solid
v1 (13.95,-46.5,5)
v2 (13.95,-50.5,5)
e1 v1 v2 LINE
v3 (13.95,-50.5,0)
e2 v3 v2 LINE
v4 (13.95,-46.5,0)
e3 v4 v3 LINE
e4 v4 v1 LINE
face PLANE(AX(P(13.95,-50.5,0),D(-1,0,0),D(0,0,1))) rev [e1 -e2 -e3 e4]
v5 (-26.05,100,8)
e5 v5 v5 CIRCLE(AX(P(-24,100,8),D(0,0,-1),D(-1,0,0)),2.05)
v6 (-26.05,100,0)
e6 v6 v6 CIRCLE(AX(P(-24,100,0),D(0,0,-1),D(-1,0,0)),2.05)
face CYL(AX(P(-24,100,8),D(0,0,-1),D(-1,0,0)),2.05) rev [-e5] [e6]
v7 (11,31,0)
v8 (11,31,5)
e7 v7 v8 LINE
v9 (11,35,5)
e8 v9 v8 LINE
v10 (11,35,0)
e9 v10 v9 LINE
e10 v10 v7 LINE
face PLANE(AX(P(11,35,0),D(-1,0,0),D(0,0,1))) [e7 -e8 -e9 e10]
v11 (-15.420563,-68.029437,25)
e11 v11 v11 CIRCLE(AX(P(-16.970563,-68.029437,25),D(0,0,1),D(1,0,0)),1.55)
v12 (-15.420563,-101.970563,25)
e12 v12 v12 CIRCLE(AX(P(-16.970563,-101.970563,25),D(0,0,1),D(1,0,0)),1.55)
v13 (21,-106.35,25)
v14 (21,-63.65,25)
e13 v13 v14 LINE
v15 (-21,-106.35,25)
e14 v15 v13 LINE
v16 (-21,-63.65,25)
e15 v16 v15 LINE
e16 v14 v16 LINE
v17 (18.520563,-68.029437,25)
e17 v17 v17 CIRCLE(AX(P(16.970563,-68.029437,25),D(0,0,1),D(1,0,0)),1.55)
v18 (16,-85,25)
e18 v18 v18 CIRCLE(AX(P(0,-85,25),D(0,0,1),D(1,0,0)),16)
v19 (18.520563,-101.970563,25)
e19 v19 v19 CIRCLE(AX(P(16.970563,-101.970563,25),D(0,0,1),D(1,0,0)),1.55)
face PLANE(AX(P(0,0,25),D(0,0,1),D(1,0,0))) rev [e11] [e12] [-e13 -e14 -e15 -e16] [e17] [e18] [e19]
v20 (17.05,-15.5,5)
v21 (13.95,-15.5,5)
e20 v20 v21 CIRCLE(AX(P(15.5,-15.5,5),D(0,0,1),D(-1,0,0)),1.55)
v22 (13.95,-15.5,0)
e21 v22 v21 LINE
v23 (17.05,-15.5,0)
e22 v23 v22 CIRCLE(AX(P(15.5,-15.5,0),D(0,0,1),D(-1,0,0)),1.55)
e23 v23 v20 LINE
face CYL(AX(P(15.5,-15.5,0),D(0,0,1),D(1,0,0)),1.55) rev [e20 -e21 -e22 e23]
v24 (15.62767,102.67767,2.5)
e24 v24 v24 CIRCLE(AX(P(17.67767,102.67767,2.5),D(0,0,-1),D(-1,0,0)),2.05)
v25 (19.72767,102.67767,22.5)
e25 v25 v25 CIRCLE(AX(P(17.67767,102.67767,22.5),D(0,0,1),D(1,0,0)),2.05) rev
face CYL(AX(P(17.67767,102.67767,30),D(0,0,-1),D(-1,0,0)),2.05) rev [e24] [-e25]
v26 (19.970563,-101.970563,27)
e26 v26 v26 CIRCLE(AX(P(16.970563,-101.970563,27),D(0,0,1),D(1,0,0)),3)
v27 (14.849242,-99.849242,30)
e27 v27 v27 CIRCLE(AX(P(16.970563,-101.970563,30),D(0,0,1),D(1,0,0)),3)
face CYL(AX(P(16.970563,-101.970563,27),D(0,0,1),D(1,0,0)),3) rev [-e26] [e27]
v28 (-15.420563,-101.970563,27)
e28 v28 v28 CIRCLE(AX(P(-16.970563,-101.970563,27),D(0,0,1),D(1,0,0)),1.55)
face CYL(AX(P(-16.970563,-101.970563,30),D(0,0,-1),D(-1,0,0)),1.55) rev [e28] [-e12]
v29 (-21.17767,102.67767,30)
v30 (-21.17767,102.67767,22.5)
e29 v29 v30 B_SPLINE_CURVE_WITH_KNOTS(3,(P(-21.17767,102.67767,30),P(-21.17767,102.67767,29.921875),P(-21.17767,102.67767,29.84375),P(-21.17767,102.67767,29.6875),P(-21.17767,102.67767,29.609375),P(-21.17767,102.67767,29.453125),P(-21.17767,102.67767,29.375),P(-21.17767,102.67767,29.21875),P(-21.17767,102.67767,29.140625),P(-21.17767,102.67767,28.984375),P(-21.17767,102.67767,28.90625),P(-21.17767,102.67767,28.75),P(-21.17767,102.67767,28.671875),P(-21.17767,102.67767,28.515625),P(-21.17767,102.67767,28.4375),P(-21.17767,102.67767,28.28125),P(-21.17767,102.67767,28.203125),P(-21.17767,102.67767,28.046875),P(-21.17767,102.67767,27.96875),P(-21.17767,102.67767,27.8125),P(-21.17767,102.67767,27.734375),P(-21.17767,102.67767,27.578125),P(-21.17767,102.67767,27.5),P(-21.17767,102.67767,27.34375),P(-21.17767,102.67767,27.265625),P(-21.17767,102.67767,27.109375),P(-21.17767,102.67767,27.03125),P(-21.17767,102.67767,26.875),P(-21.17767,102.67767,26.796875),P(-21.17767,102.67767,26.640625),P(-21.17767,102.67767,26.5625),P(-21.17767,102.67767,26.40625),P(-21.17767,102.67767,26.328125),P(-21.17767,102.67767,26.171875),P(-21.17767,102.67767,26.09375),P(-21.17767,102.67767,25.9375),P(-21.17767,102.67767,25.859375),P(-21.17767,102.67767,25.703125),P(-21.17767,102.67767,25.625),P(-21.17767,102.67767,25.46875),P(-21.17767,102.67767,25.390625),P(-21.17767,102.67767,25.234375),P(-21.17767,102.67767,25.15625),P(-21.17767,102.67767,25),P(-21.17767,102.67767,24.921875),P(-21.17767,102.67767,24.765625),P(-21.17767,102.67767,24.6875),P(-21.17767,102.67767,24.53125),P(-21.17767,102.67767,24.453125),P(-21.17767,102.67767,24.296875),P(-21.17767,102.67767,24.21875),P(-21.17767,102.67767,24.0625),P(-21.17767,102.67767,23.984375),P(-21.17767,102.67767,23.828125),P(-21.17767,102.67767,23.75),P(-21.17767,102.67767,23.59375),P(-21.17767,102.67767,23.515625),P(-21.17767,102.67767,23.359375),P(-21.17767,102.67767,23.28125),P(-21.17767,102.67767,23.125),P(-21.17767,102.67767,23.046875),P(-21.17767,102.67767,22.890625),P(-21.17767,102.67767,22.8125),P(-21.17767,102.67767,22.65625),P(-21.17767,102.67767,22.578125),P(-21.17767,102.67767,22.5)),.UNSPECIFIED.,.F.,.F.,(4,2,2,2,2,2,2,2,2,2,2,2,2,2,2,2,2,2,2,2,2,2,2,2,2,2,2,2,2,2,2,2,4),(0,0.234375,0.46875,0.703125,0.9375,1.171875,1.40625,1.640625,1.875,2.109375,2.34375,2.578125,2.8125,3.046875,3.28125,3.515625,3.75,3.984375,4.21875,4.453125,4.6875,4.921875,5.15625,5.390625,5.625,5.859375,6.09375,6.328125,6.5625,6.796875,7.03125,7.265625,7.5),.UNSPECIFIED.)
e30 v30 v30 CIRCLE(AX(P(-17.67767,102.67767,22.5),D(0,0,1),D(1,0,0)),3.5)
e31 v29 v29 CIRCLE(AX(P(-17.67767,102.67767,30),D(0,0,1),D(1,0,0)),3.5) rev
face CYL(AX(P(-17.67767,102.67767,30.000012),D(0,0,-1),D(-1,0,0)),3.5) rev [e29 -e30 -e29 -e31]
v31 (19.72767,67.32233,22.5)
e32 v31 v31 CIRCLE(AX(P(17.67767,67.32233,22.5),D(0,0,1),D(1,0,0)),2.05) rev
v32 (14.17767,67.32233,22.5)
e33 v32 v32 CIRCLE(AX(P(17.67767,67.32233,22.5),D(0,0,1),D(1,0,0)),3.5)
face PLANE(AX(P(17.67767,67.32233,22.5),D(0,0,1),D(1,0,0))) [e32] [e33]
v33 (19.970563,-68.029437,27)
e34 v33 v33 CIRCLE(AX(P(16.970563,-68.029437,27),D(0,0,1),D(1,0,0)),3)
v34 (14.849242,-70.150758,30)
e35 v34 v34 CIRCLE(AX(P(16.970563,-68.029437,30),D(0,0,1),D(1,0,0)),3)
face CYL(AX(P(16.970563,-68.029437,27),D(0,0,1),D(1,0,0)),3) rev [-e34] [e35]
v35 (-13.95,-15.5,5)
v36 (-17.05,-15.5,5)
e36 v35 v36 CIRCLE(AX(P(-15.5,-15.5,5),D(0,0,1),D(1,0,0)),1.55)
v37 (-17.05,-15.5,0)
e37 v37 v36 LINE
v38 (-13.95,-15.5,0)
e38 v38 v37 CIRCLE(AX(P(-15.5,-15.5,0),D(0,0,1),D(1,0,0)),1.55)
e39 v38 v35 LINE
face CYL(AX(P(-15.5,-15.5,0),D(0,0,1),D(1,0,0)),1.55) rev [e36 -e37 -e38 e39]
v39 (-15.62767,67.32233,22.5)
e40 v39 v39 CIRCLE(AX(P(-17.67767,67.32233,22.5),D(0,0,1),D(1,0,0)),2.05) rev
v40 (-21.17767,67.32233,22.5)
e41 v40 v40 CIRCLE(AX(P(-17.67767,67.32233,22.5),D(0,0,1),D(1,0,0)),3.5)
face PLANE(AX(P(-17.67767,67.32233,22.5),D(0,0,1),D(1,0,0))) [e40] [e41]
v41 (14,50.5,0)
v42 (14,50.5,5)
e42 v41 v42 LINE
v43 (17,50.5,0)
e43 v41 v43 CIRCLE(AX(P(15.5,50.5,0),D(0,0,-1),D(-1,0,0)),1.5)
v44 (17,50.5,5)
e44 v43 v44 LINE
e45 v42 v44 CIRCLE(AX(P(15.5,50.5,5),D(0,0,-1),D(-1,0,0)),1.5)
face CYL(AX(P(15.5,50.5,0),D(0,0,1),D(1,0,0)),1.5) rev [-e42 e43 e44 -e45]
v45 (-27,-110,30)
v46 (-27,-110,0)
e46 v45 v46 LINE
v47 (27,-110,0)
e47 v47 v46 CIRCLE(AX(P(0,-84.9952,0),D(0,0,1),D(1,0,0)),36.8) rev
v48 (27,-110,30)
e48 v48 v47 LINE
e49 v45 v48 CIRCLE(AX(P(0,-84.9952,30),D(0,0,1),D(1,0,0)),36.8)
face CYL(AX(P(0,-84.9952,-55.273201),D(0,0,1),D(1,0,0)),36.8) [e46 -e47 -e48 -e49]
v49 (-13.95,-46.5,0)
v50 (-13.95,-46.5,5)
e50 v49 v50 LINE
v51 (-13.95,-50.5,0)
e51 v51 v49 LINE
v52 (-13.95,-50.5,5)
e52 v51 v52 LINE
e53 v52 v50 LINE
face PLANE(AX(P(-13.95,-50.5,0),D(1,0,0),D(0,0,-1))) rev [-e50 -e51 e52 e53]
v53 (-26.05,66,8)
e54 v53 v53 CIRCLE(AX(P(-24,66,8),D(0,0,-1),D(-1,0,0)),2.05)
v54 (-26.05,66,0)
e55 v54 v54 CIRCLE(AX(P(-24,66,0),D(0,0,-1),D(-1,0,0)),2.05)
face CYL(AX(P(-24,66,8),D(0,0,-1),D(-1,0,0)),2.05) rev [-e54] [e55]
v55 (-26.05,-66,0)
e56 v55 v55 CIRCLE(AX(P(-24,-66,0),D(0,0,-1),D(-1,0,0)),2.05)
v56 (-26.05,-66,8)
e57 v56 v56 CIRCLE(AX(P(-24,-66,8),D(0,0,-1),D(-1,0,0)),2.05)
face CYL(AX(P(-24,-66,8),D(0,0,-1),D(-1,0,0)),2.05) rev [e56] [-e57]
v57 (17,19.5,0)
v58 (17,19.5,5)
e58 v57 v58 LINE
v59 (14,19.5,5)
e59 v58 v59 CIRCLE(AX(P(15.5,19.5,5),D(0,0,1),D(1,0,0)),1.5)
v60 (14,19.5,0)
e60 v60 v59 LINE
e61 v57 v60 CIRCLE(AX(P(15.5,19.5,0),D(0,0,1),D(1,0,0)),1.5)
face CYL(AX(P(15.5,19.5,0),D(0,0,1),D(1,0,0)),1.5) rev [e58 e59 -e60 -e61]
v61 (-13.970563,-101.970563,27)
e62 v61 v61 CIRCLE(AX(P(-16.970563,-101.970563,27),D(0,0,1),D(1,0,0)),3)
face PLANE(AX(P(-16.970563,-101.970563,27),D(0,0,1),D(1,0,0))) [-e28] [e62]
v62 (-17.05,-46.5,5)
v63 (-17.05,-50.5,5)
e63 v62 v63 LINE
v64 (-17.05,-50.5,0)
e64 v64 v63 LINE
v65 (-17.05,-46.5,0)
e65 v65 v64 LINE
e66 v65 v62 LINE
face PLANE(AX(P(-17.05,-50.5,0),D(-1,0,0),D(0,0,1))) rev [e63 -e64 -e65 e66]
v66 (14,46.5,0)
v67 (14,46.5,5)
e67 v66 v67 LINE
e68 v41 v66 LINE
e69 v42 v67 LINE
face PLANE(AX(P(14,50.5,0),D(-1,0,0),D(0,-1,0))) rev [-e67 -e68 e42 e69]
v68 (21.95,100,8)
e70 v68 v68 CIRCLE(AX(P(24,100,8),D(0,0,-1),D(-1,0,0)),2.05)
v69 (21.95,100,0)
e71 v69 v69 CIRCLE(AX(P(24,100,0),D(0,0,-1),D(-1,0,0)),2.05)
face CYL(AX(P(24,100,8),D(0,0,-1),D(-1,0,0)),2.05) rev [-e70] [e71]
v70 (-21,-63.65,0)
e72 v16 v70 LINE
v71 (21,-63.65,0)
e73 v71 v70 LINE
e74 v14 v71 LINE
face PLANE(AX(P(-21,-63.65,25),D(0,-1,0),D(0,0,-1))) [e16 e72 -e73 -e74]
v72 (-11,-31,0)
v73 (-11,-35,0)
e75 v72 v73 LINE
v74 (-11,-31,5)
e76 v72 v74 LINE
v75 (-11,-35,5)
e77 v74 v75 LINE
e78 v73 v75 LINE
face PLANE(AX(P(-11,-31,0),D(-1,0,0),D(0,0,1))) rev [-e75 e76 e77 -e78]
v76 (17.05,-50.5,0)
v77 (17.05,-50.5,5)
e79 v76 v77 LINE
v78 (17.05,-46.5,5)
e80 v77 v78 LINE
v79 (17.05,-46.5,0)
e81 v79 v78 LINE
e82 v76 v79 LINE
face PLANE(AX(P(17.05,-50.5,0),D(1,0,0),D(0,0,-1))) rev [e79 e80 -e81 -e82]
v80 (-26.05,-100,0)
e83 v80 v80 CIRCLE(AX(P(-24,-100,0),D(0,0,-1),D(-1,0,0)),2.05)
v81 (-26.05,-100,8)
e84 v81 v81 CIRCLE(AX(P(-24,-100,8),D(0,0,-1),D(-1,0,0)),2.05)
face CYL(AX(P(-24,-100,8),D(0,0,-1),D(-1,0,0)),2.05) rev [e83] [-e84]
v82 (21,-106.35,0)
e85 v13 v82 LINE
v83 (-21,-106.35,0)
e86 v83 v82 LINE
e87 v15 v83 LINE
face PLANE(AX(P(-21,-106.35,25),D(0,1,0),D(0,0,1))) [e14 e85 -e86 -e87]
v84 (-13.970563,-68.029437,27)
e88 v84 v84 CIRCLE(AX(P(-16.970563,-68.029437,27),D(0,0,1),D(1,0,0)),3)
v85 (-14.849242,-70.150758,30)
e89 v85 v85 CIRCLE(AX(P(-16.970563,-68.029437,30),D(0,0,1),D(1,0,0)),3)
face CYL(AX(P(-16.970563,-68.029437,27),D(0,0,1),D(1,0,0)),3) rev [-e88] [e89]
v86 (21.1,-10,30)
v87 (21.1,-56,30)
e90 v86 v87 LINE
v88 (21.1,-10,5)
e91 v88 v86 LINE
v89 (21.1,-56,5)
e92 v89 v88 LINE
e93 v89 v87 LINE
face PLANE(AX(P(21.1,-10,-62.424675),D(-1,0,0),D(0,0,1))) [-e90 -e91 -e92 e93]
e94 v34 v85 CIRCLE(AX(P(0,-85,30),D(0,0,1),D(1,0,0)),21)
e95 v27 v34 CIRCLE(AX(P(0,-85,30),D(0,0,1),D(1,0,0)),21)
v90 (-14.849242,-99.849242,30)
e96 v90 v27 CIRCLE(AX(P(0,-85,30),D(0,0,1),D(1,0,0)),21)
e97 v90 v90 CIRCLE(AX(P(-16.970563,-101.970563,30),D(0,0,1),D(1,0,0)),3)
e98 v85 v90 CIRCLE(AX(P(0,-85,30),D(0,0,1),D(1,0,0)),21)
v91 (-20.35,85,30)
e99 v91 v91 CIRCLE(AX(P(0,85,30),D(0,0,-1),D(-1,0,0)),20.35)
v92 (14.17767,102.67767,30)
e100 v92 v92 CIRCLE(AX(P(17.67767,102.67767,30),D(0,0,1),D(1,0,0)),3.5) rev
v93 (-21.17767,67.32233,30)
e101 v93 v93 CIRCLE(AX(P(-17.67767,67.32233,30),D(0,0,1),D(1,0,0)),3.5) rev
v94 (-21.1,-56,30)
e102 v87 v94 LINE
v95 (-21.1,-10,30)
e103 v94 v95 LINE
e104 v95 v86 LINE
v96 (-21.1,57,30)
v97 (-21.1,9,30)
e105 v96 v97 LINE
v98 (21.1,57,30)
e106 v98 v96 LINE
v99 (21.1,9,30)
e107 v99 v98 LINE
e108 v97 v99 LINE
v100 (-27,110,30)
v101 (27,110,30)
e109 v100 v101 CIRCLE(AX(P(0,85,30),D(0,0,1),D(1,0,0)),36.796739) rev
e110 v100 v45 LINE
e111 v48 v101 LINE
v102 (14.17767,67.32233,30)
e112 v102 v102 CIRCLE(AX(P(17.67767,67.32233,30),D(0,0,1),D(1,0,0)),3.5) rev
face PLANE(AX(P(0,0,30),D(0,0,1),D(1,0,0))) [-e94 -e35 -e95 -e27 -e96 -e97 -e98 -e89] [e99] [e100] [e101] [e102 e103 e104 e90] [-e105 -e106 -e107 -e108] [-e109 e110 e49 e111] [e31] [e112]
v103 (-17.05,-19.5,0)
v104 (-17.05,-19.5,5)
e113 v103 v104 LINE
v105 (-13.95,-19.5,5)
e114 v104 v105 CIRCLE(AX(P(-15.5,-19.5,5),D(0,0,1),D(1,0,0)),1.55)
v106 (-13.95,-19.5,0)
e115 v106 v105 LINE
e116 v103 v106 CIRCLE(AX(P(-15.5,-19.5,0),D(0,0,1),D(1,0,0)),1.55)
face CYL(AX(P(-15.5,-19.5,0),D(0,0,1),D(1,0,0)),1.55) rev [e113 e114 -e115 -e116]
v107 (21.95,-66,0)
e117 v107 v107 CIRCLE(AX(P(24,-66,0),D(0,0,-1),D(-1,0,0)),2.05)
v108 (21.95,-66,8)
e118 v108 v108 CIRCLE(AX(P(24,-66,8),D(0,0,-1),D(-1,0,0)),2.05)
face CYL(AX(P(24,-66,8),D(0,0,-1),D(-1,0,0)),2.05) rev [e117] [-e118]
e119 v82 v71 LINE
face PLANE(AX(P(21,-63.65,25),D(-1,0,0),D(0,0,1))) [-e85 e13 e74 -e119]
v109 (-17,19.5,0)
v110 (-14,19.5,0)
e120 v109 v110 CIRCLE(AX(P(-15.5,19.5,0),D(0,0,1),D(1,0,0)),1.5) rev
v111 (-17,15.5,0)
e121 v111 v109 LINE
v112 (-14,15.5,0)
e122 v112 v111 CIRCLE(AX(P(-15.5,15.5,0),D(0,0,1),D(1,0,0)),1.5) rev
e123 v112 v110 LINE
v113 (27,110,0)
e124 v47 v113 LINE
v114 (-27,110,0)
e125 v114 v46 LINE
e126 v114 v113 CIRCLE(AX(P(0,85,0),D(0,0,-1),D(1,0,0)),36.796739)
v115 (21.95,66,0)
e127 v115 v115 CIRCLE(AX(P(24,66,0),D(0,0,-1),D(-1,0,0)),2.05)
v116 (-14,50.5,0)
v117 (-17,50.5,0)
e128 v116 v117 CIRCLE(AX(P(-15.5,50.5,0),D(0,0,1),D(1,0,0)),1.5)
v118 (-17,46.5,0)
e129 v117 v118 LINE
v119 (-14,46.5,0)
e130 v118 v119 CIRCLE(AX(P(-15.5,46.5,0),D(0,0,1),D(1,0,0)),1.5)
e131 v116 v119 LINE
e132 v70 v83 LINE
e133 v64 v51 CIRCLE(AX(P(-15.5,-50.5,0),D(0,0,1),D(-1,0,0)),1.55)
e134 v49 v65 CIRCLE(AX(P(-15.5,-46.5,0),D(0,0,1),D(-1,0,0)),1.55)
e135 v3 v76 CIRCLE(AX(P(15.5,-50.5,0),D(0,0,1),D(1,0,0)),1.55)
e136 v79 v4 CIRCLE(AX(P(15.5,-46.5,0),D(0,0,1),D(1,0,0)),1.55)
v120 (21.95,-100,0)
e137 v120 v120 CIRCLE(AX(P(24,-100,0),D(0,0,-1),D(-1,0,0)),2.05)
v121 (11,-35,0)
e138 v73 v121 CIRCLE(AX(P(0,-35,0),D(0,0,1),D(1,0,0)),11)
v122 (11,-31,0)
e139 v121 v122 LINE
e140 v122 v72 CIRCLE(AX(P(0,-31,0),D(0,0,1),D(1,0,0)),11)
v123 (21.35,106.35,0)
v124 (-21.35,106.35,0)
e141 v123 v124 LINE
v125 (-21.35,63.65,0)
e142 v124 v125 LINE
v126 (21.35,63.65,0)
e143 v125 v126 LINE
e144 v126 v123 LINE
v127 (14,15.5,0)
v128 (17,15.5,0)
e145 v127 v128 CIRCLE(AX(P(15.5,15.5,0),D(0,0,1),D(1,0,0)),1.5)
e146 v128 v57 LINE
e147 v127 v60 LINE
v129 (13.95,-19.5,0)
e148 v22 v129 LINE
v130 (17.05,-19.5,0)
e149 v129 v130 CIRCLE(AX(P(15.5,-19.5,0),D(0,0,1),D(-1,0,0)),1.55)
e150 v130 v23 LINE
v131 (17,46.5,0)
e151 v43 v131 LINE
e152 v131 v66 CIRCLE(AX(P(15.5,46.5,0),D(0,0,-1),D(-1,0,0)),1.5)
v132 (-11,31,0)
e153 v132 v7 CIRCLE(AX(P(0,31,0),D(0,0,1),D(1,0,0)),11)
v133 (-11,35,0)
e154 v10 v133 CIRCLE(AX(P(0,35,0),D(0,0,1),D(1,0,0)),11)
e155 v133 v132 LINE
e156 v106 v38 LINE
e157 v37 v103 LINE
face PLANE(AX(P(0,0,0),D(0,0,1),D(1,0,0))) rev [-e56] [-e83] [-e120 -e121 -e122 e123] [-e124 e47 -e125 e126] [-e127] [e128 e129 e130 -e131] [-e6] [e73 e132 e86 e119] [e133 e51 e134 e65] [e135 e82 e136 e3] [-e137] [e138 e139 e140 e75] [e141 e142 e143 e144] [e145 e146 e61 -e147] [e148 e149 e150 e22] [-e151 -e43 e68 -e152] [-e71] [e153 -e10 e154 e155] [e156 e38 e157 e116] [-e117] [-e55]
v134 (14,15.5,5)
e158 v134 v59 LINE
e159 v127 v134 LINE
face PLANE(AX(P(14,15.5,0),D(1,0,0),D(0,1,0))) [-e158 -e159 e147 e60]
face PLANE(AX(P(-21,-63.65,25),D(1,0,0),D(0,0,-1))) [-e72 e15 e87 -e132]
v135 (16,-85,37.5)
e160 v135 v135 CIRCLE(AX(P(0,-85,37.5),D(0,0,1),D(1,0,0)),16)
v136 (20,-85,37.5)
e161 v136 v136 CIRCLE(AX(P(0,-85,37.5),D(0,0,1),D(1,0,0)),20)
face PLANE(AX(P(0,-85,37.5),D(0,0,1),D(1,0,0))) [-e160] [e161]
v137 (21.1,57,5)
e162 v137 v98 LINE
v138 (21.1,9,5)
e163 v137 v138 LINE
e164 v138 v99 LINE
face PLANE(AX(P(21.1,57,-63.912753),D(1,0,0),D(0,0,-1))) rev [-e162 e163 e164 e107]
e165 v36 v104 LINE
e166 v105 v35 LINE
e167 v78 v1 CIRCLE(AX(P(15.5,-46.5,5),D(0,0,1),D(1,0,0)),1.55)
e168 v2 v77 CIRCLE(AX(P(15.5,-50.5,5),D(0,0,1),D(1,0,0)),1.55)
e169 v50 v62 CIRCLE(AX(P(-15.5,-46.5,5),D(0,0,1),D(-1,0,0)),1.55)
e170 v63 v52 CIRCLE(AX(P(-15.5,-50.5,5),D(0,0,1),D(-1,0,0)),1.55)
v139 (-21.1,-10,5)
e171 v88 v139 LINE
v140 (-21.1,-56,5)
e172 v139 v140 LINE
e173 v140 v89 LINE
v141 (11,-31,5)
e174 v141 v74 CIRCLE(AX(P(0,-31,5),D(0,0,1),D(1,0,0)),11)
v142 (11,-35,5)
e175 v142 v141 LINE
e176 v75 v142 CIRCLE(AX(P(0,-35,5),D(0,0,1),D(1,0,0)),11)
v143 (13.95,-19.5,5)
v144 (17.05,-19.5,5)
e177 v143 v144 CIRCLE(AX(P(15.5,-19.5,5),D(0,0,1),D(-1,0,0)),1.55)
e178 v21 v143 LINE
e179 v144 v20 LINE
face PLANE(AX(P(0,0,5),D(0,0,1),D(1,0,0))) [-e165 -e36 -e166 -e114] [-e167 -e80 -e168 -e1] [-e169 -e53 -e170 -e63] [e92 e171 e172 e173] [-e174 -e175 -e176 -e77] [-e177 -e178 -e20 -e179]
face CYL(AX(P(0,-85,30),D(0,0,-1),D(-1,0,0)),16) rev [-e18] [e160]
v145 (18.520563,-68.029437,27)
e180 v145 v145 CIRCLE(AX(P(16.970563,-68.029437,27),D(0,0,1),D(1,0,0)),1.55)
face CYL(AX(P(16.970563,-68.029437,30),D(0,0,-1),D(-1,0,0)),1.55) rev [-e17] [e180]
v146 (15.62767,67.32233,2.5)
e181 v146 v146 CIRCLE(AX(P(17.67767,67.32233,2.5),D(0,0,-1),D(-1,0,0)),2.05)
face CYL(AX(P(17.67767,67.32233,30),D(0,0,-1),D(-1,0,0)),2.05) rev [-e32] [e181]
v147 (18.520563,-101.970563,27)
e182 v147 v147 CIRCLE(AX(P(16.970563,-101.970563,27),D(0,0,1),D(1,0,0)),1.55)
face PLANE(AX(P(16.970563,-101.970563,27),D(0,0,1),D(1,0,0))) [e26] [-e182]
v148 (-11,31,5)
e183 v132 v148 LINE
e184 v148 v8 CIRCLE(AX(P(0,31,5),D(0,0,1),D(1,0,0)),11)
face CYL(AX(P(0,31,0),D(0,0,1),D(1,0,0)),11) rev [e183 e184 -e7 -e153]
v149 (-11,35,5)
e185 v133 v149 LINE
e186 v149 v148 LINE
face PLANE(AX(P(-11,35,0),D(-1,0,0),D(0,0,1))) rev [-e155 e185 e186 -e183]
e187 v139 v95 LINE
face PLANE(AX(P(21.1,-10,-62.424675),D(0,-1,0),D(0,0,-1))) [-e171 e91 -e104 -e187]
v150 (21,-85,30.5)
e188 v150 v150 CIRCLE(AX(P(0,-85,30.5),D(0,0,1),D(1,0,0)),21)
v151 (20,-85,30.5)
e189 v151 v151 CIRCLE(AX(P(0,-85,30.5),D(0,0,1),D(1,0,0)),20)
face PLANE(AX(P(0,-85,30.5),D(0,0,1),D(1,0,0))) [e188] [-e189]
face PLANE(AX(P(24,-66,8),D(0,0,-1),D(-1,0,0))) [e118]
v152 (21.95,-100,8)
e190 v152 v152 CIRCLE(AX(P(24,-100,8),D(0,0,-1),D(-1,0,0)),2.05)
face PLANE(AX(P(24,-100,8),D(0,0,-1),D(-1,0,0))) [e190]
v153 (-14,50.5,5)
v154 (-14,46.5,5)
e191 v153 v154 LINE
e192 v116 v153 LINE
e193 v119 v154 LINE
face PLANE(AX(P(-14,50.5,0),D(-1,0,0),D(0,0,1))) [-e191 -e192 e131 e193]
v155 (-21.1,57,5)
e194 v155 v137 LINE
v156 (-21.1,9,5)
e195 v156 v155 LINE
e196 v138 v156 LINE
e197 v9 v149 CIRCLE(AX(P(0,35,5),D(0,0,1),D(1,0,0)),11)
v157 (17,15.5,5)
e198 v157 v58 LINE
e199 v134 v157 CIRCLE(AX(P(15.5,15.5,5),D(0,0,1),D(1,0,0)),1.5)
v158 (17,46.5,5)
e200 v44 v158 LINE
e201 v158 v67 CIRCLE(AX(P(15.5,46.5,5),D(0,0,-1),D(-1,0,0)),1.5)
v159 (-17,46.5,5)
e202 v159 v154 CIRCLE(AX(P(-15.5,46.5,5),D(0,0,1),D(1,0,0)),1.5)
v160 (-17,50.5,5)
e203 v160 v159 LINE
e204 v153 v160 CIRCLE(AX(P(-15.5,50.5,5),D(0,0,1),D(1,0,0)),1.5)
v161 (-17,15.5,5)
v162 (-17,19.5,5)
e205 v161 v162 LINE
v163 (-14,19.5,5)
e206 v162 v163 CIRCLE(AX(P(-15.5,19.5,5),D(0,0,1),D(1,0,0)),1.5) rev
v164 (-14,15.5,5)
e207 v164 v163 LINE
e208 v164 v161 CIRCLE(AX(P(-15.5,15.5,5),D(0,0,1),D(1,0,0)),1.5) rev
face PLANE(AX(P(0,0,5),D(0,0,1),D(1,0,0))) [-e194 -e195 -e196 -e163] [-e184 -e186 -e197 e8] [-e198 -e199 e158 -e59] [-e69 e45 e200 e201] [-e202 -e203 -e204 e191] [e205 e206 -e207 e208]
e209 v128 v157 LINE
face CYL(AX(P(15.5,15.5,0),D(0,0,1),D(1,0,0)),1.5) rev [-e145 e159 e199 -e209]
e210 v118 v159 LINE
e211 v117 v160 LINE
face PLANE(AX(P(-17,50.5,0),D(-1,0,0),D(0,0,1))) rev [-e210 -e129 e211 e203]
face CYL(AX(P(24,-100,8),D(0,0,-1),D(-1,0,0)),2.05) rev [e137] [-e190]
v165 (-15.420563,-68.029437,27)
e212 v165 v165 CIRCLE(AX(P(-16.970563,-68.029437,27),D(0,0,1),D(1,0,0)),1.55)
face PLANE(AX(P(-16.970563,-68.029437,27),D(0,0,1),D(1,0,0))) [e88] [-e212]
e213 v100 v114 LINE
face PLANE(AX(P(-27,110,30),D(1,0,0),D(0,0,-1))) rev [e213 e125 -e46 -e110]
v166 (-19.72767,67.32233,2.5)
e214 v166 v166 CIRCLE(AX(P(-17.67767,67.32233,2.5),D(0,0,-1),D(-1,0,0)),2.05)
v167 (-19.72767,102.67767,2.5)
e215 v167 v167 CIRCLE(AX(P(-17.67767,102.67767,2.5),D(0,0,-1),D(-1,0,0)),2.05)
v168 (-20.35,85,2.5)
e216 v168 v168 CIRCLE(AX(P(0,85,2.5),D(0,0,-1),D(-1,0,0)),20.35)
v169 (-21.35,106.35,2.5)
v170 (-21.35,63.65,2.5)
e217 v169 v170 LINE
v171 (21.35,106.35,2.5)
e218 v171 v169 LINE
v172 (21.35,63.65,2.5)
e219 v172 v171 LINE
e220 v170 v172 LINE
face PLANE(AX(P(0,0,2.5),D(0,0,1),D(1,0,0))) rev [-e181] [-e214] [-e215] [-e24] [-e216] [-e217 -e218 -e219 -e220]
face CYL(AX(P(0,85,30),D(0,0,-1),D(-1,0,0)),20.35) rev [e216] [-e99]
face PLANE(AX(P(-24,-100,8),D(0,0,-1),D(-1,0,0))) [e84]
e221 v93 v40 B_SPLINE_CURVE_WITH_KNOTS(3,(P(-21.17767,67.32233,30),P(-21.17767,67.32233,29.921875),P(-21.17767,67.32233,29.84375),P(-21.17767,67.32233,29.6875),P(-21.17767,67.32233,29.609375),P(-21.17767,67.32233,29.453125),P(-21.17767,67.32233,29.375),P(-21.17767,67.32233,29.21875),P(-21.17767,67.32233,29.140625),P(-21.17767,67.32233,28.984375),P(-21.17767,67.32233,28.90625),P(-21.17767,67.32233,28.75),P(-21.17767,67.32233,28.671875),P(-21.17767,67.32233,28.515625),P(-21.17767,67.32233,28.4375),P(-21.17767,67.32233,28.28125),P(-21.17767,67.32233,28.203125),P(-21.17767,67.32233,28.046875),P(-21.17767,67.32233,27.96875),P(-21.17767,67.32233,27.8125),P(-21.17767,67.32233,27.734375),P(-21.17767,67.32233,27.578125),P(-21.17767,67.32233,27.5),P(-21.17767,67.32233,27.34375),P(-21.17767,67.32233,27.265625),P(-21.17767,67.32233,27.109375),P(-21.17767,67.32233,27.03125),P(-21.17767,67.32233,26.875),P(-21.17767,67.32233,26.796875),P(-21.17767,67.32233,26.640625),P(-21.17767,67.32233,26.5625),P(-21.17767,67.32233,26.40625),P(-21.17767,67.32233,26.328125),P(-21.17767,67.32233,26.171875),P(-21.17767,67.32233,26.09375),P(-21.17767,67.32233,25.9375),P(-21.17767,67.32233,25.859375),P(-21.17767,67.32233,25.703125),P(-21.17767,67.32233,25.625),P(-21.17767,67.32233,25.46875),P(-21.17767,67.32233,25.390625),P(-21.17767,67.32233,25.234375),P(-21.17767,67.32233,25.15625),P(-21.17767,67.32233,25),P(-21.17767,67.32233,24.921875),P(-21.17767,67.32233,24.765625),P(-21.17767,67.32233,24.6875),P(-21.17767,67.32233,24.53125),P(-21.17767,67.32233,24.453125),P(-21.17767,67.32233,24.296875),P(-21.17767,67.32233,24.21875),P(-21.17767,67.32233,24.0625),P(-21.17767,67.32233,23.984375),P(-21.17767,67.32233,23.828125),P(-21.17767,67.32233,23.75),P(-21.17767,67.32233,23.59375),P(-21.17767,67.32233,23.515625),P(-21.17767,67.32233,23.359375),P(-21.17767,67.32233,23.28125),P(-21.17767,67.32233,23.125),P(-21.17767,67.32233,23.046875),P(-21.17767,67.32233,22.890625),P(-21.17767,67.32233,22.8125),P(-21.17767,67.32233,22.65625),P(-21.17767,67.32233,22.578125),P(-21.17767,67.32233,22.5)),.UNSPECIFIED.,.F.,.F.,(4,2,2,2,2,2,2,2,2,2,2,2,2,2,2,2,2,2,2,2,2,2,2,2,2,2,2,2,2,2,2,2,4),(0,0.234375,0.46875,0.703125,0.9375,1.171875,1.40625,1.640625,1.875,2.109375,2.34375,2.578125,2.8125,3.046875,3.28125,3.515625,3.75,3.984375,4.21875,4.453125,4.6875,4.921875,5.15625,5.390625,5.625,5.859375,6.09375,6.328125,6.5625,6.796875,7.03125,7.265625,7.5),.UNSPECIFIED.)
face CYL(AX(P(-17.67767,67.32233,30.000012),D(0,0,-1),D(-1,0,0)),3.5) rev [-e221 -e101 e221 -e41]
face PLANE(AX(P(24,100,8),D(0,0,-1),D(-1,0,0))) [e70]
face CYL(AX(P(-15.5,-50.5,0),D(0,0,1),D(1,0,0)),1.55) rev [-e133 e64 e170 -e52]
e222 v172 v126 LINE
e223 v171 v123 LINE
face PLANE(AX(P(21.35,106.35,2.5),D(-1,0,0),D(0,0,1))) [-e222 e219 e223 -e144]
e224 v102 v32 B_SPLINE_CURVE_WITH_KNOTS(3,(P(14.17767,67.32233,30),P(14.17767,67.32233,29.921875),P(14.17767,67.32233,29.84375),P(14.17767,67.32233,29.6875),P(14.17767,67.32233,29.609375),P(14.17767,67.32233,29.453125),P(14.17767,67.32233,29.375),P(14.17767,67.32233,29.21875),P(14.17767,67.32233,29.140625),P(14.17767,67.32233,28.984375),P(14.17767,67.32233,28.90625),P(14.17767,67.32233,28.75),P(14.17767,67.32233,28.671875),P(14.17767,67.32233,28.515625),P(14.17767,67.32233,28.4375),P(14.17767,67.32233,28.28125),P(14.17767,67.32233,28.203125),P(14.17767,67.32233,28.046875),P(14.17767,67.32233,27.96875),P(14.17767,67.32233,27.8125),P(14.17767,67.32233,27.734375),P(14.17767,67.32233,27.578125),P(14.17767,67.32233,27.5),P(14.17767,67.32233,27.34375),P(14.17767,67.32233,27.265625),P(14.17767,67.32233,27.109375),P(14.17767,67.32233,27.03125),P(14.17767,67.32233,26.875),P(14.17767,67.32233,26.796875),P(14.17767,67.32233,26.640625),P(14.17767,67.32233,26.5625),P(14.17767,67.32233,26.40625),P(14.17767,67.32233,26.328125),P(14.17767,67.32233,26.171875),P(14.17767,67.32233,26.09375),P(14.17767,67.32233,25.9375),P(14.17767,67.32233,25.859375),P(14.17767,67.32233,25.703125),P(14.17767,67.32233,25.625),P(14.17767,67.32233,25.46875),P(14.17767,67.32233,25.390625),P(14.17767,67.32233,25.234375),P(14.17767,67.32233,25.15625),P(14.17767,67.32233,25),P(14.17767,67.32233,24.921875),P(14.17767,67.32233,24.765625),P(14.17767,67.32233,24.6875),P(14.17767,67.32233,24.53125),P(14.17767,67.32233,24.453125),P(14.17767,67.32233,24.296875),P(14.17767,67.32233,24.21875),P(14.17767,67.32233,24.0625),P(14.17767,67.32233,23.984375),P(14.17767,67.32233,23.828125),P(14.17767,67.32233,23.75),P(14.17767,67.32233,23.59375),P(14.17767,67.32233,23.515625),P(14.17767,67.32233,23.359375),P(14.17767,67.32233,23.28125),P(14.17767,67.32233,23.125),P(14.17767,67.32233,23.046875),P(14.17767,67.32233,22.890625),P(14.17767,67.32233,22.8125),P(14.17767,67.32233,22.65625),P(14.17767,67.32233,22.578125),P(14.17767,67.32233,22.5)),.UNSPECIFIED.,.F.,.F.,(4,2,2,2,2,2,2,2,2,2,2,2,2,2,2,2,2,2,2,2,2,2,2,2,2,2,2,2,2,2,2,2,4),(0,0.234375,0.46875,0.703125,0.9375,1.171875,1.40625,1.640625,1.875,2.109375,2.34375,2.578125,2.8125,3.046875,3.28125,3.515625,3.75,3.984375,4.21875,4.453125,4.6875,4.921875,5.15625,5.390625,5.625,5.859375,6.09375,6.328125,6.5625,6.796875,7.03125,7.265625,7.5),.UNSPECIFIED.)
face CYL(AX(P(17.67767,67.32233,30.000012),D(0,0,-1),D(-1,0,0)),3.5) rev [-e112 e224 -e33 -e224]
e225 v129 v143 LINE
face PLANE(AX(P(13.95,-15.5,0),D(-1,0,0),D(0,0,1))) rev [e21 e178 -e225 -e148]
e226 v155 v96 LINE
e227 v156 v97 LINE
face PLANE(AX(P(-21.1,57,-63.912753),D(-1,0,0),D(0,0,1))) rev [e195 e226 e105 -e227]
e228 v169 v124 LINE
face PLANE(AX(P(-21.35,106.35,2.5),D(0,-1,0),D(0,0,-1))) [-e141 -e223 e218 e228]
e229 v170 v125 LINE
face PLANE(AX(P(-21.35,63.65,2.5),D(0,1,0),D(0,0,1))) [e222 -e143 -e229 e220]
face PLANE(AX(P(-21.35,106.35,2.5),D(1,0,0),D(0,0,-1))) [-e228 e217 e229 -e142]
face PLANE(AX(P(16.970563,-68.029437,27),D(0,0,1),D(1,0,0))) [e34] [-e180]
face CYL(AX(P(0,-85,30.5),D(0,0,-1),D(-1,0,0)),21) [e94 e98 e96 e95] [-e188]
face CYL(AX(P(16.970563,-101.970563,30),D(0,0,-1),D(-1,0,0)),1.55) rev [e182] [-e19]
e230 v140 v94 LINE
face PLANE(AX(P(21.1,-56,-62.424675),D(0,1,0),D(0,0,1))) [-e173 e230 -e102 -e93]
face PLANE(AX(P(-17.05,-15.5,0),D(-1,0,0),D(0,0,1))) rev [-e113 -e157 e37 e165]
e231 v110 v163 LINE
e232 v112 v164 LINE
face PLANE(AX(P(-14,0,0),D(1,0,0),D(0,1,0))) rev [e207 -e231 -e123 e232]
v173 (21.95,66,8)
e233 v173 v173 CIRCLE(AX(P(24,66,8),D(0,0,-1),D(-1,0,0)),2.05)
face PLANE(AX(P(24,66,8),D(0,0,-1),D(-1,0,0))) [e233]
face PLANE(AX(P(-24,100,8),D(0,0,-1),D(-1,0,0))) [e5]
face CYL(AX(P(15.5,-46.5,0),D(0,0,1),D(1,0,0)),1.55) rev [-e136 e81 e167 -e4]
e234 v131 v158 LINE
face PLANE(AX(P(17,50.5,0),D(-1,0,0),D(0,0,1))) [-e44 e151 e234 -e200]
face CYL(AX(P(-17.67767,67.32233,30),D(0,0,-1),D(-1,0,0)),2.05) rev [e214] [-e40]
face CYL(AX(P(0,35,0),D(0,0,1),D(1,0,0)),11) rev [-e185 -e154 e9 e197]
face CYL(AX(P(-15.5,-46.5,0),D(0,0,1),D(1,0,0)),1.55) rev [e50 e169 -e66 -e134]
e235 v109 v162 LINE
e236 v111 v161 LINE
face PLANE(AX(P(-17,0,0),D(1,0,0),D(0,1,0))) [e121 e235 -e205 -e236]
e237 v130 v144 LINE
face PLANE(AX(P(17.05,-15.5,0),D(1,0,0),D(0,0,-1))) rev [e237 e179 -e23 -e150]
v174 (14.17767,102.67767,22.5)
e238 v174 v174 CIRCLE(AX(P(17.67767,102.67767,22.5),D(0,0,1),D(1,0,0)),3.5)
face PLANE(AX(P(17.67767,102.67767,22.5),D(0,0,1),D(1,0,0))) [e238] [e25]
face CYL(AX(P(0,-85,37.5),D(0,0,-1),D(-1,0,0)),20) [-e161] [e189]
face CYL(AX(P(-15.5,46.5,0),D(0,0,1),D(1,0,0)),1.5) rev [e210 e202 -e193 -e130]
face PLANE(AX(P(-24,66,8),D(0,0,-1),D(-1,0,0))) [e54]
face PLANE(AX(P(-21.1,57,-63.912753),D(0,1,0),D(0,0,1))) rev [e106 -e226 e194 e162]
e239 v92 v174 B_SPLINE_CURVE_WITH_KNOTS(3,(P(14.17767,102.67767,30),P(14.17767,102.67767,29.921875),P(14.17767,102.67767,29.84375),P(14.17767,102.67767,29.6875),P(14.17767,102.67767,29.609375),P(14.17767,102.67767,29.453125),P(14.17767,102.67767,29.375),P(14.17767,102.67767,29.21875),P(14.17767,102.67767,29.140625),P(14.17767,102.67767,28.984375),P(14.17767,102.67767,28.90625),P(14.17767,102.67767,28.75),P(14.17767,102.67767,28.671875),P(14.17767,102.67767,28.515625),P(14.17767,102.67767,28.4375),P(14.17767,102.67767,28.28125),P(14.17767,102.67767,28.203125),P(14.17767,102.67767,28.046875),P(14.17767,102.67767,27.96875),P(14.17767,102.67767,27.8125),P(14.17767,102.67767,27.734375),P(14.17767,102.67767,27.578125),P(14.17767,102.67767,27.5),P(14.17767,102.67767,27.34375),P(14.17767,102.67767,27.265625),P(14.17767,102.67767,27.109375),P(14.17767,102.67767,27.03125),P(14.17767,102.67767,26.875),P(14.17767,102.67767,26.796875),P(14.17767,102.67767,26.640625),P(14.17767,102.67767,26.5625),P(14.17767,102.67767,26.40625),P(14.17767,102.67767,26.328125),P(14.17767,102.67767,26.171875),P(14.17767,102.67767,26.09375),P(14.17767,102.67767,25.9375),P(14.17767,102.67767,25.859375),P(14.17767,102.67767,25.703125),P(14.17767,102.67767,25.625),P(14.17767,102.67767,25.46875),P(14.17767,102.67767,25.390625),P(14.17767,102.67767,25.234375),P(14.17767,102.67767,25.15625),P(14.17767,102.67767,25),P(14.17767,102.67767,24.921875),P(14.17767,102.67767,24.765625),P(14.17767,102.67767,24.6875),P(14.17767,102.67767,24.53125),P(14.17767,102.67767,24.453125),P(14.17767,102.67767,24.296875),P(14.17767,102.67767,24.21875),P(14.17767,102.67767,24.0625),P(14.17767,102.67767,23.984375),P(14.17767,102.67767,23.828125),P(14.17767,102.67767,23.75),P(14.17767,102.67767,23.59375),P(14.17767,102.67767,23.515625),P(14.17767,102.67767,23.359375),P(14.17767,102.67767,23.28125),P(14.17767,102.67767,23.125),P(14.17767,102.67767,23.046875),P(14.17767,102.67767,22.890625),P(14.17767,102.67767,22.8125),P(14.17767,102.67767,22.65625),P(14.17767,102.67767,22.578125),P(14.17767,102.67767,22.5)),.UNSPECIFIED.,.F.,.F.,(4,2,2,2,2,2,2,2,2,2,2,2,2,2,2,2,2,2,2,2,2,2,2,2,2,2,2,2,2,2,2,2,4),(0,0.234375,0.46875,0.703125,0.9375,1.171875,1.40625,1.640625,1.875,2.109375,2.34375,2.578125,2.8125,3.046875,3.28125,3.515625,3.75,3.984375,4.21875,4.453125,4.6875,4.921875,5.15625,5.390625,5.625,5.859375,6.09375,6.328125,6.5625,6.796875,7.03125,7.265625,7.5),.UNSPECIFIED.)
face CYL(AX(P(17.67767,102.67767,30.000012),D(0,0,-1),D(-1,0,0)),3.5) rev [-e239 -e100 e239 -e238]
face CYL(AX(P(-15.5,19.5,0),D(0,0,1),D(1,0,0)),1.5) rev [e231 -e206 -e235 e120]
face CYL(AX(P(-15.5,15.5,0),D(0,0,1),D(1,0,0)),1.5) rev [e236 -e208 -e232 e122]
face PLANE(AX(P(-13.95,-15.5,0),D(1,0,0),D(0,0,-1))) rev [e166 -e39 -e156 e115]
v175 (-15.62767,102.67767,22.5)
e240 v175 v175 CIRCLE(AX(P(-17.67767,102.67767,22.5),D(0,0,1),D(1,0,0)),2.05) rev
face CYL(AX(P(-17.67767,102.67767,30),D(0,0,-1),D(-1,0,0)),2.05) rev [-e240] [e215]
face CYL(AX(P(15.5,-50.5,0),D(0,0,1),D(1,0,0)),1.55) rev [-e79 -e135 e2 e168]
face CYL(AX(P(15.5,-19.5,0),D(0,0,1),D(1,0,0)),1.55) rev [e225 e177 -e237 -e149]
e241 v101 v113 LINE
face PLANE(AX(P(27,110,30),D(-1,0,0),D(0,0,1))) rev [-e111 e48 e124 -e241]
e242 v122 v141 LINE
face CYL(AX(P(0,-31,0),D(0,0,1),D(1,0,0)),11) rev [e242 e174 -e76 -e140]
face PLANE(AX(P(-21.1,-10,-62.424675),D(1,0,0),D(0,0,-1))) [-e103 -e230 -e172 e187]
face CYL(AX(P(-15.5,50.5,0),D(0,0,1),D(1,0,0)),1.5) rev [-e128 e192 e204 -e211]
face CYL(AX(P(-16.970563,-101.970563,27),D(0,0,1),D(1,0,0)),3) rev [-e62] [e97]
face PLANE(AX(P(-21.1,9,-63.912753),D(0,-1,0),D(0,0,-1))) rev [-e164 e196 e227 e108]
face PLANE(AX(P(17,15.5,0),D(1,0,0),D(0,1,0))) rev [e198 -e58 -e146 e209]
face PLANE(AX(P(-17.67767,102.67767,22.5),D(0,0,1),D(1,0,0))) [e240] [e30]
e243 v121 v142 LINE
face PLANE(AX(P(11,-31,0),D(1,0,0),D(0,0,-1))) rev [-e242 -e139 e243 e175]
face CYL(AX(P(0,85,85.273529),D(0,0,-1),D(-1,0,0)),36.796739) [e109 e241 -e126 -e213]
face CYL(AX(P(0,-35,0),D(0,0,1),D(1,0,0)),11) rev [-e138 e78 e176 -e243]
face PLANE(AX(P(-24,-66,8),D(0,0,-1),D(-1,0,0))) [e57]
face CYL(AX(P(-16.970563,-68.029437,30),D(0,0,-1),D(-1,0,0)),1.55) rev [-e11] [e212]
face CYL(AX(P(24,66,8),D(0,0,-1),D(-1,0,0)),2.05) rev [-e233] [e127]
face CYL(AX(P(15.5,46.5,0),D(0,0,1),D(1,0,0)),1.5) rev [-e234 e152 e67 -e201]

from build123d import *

# Parameters (mm, degrees)
SKETCH_1_W                = 54
SKETCH_1_H                = 220
EXTRUDE_1_DEPTH           = 30
SKETCH_2_W                = 42.2
SKETCH_2_H                = 48
CUT_EXTRUDE_1_DEPTH       = 25
SKETCH_3_W                = 42.2
SKETCH_3_H                = 46
CUT_EXTRUDE_2_DEPTH       = 25
CUT_EXTRUDE_3_DEPTH       = 116.99137899
CUT_EXTRUDE_13_DEPTH      = 116.99137899
SKETCH_18_W               = 42
SKETCH_18_H               = 42.7
CUT_EXTRUDE_9_DEPTH       = 25
SKETCH_9_R                = 16
SKETCH_9_R_2              = 1.55
CUT_EXTRUDE_4_DEPTH       = 116.99137899
SKETCH_16_W               = 42.7
SKETCH_16_H               = 42.7
CUT_EXTRUDE_7_DEPTH       = 2.5
SKETCH_13_R               = 20.35
SKETCH_13_R_2             = 2.05
CUT_EXTRUDE_6_DEPTH       = 117.555780637
EXTRUDE_3_DEPTH           = 30
SKETCH_17_R               = 2.05
CUT_EXTRUDE_8_DEPTH       = 8
CUT_EXTRUDE_11_DEPTH      = 129.309959191
CUT_EXTRUDE_11_DEPTH_BACK = 7.5
SKETCH_21_R               = 3.5
EXTRUDE_4_DEPTH           = 30
SKETCH_29_R               = 3
CUT_EXTRUDE_15_DEPTH      = 3
SKETCH_30_R               = 2.05
CUT_EXTRUDE_16_DEPTH      = 8
SKETCH_33_R               = 20
SKETCH_33_R_2             = 16
EXTRUDE_7_DEPTH           = 7.5
SKETCH_34_R               = 21
SKETCH_34_R_2             = 20
EXTRUDE_8_DEPTH           = 0.5


with BuildPart() as part:
    # 草图1 → 凸台-拉伸1 (new body)
    with BuildSketch(Plane.XY):
        Rectangle(SKETCH_1_W, SKETCH_1_H)
    extrude(amount=EXTRUDE_1_DEPTH)

    # 草图2 → 切除-拉伸1 (cut)
    with BuildSketch(Plane.XY.offset(30)):
        with Locations((0, 33)):
            Rectangle(SKETCH_2_W, SKETCH_2_H)
    extrude(amount=-CUT_EXTRUDE_1_DEPTH, mode=Mode.SUBTRACT)

    # 草图3 → 切除-拉伸2 (cut)
    with BuildSketch(Plane(origin=(0, 0, 30), x_dir=(-1, 0, 0), z_dir=(0, 0, -1))):
        with Locations((0, -33)):
            Rectangle(SKETCH_3_W, SKETCH_3_H)
    extrude(amount=CUT_EXTRUDE_2_DEPTH, mode=Mode.SUBTRACT)

    # 草图4 → 切除-拉伸3 (cut, through all)
    with BuildSketch(Plane.XY.offset(5)):
        with BuildLine():
            Line((11, 31), (11, 35))
            ThreePointArc((11, 35), (0, 46), (-11, 35))
            Line((-11, 35), (-11, 31))
            ThreePointArc((-11, 31), (0, 20), (11, 31))
        make_face()
        with BuildLine():
            Line((-14, 46.5), (-14, 50.5))
            ThreePointArc((-14, 50.5), (-15.5, 52), (-17, 50.5))
            Line((-17, 50.5), (-17, 46.5))
            ThreePointArc((-17, 46.5), (-15.5, 45), (-14, 46.5))
        make_face()
        with BuildLine():
            ThreePointArc((17, 50.5), (15.5, 52), (14, 50.5))
            Line((14, 50.5), (14, 46.5))
            ThreePointArc((14, 46.5), (15.5, 45), (17, 46.5))
            Line((17, 46.5), (17, 50.5))
        make_face()
        with BuildLine():
            Line((14, 19.5), (14, 15.5))
            ThreePointArc((14, 15.5), (15.5, 14), (17, 15.5))
            Line((17, 15.5), (17, 19.5))
            ThreePointArc((17, 19.5), (15.5, 21), (14, 19.5))
        make_face()
        with BuildLine():
            ThreePointArc((-17, 15.5), (-15.5, 14), (-14, 15.5))
            Line((-14, 15.5), (-14, 19.5))
            ThreePointArc((-14, 19.5), (-15.5, 21), (-17, 19.5))
            Line((-17, 19.5), (-17, 15.5))
        make_face()
    extrude(amount=-CUT_EXTRUDE_3_DEPTH, mode=Mode.SUBTRACT)

    # 草图26 → 切除-拉伸13 (cut, through all)
    with BuildSketch(Plane.XY.offset(5)):
        with BuildLine():
            Line((11, -31), (11, -35))
            ThreePointArc((11, -35), (0, -46), (-11, -35))
            Line((-11, -35), (-11, -31))
            ThreePointArc((-11, -31), (0, -20), (11, -31))
        make_face()
        with BuildLine():
            Line((-13.95, -15.5), (-13.95, -19.5))
            ThreePointArc((-13.95, -19.5), (-15.5, -21.05), (-17.05, -19.5))
            Line((-17.05, -19.5), (-17.05, -15.5))
            ThreePointArc((-17.05, -15.5), (-15.5, -13.95), (-13.95, -15.5))
        make_face()
        with BuildLine():
            Line((-13.95, -50.5), (-13.95, -46.5))
            ThreePointArc((-13.95, -46.5), (-15.5, -44.95), (-17.05, -46.5))
            Line((-17.05, -46.5), (-17.05, -50.5))
            ThreePointArc((-17.05, -50.5), (-15.5, -52.05), (-13.95, -50.5))
        make_face()
        with BuildLine():
            Line((13.95, -50.5), (13.95, -46.5))
            ThreePointArc((13.95, -46.5), (15.5, -44.95), (17.05, -46.5))
            Line((17.05, -46.5), (17.05, -50.5))
            ThreePointArc((17.05, -50.5), (15.5, -52.05), (13.95, -50.5))
        make_face()
        with BuildLine():
            Line((13.95, -15.5), (13.95, -19.5))
            ThreePointArc((13.95, -19.5), (15.5, -21.05), (17.05, -19.5))
            Line((17.05, -19.5), (17.05, -15.5))
            ThreePointArc((17.05, -15.5), (15.5, -13.95), (13.95, -15.5))
        make_face()
    extrude(amount=-CUT_EXTRUDE_13_DEPTH, mode=Mode.SUBTRACT)

    # 草图18 → 切除-拉伸9 (cut)
    with BuildSketch(Plane.XY):
        with Locations((0, -85)):
            Rectangle(SKETCH_18_W, SKETCH_18_H)
    extrude(amount=CUT_EXTRUDE_9_DEPTH, mode=Mode.SUBTRACT)

    # 草图9 → 切除-拉伸4 (cut, through all)
    with BuildSketch(Plane.XY.offset(25)):
        with Locations((0, -85)):
            Circle(SKETCH_9_R)
        with Locations((-16.970562748, -68.029437252)):
            Circle(SKETCH_9_R_2)
        with Locations((16.970562748, -68.029437252)):
            Circle(SKETCH_9_R_2)
        with Locations((16.970562748, -101.970562748)):
            Circle(SKETCH_9_R_2)
        with Locations((-16.970562748, -101.970562748)):
            Circle(SKETCH_9_R_2)
    extrude(amount=CUT_EXTRUDE_4_DEPTH, mode=Mode.SUBTRACT)

    # 草图16 → 切除-拉伸7 (cut)
    with BuildSketch(Plane.XY):
        with Locations((0, 85)):
            Rectangle(SKETCH_16_W, SKETCH_16_H)
    extrude(amount=CUT_EXTRUDE_7_DEPTH, mode=Mode.SUBTRACT)

    # 草图13 → 切除-拉伸6 (cut, through all)
    with BuildSketch(Plane(origin=(0, 0, 2.5), x_dir=(-1, 0, 0), z_dir=(0, 0, -1))):
        with Locations((0, 85)):
            Circle(SKETCH_13_R)
        with Locations((-17.67766953, 102.67766953)):
            Circle(SKETCH_13_R_2)
        with Locations((17.67766953, 102.67766953)):
            Circle(SKETCH_13_R_2)
        with Locations((17.67766953, 67.32233047)):
            Circle(SKETCH_13_R_2)
        with Locations((-17.67766953, 67.32233047)):
            Circle(SKETCH_13_R_2)
    extrude(amount=-CUT_EXTRUDE_6_DEPTH, mode=Mode.SUBTRACT)

    # 草图15 → 凸台-拉伸3 (add)
    with BuildSketch(Plane(origin=(0, 0, 0), x_dir=(-1, 0, 0), z_dir=(0, 0, -1))):
        with BuildLine():
            Line((-27, 110), (27, 110))
            ThreePointArc((27, 110), (0, 121.796738986), (-27, 110))
        make_face()
    extrude(amount=-EXTRUDE_3_DEPTH)

    # 草图17 → 切除-拉伸8 (cut)
    with BuildSketch(Plane(origin=(0, 0, 0), x_dir=(-1, 0, 0), z_dir=(0, 0, -1))):
        with Locations((-24, 100)):
            Circle(SKETCH_17_R)
        with Locations((24, 100)):
            Circle(SKETCH_17_R)
        with Locations((24, 66)):
            Circle(SKETCH_17_R)
        with Locations((-24, 66)):
            Circle(SKETCH_17_R)
    extrude(amount=-CUT_EXTRUDE_8_DEPTH, mode=Mode.SUBTRACT)

    # 草图21 → 切除-拉伸11 (cut, two sides: drawn at the far end of the back side and taken through both)
    with BuildSketch(Plane.XY.offset(30).offset(-CUT_EXTRUDE_11_DEPTH_BACK)):
        with Locations(Location((-17.67766953, 102.67766953, 0), (0, 0, 180))):
            Circle(SKETCH_21_R)
        with Locations(Location((17.67766953, 102.67766953, 0), (0, 0, 180))):
            Circle(SKETCH_21_R)
        with Locations(Location((17.67766953, 67.32233047, 0), (0, 0, 180))):
            Circle(SKETCH_21_R)
        with Locations(Location((-17.67766953, 67.32233047, 0), (0, 0, 180))):
            Circle(SKETCH_21_R)
    extrude(amount=CUT_EXTRUDE_11_DEPTH + CUT_EXTRUDE_11_DEPTH_BACK, mode=Mode.SUBTRACT)

    # 草图28 → 凸台-拉伸4 (add)
    with BuildSketch(Plane.XY.offset(30)):
        with BuildLine():
            Line((-27, -110), (27, -110))
            ThreePointArc((27, -110), (0, -121.795200461), (-27, -110))
        make_face()
    extrude(amount=-EXTRUDE_4_DEPTH)

    # 草图29 → 切除-拉伸15 (cut)
    with BuildSketch(Plane.XY.offset(30)):
        with Locations((-16.970562748, -68.029437252)):
            Circle(SKETCH_29_R)
        with Locations((16.970562748, -68.029437252)):
            Circle(SKETCH_29_R)
        with Locations((16.970562748, -101.970562748)):
            Circle(SKETCH_29_R)
        with Locations((-16.970562748, -101.970562748)):
            Circle(SKETCH_29_R)
    extrude(amount=-CUT_EXTRUDE_15_DEPTH, mode=Mode.SUBTRACT)

    # 草图30 → 切除-拉伸16 (cut)
    with BuildSketch(Plane(origin=(0, 0, 0), x_dir=(-1, 0, 0), z_dir=(0, 0, -1))):
        with Locations((-24, -100)):
            Circle(SKETCH_30_R)
        with Locations((-24, -66)):
            Circle(SKETCH_30_R)
        with Locations((24, -66)):
            Circle(SKETCH_30_R)
        with Locations((24, -100)):
            Circle(SKETCH_30_R)
    extrude(amount=-CUT_EXTRUDE_16_DEPTH, mode=Mode.SUBTRACT)

    # 草图33 → 凸台-拉伸7 (add)
    with BuildSketch(Plane.XY.offset(30)):
        with Locations((0, -85)):
            Circle(SKETCH_33_R)
        with Locations((0, -85)):
            Circle(SKETCH_33_R_2, mode=Mode.SUBTRACT)
    extrude(amount=EXTRUDE_7_DEPTH)

    # 草图34 → 凸台-拉伸8 (add)
    with BuildSketch(Plane.XY.offset(30)):
        with Locations(Location((0, -85, 0), (0, 0, 224.999937448))):
            Circle(SKETCH_34_R)
        with Locations((0, -85)):
            Circle(SKETCH_34_R_2, mode=Mode.SUBTRACT)
    extrude(amount=EXTRUDE_8_DEPTH)


solid = part.part
